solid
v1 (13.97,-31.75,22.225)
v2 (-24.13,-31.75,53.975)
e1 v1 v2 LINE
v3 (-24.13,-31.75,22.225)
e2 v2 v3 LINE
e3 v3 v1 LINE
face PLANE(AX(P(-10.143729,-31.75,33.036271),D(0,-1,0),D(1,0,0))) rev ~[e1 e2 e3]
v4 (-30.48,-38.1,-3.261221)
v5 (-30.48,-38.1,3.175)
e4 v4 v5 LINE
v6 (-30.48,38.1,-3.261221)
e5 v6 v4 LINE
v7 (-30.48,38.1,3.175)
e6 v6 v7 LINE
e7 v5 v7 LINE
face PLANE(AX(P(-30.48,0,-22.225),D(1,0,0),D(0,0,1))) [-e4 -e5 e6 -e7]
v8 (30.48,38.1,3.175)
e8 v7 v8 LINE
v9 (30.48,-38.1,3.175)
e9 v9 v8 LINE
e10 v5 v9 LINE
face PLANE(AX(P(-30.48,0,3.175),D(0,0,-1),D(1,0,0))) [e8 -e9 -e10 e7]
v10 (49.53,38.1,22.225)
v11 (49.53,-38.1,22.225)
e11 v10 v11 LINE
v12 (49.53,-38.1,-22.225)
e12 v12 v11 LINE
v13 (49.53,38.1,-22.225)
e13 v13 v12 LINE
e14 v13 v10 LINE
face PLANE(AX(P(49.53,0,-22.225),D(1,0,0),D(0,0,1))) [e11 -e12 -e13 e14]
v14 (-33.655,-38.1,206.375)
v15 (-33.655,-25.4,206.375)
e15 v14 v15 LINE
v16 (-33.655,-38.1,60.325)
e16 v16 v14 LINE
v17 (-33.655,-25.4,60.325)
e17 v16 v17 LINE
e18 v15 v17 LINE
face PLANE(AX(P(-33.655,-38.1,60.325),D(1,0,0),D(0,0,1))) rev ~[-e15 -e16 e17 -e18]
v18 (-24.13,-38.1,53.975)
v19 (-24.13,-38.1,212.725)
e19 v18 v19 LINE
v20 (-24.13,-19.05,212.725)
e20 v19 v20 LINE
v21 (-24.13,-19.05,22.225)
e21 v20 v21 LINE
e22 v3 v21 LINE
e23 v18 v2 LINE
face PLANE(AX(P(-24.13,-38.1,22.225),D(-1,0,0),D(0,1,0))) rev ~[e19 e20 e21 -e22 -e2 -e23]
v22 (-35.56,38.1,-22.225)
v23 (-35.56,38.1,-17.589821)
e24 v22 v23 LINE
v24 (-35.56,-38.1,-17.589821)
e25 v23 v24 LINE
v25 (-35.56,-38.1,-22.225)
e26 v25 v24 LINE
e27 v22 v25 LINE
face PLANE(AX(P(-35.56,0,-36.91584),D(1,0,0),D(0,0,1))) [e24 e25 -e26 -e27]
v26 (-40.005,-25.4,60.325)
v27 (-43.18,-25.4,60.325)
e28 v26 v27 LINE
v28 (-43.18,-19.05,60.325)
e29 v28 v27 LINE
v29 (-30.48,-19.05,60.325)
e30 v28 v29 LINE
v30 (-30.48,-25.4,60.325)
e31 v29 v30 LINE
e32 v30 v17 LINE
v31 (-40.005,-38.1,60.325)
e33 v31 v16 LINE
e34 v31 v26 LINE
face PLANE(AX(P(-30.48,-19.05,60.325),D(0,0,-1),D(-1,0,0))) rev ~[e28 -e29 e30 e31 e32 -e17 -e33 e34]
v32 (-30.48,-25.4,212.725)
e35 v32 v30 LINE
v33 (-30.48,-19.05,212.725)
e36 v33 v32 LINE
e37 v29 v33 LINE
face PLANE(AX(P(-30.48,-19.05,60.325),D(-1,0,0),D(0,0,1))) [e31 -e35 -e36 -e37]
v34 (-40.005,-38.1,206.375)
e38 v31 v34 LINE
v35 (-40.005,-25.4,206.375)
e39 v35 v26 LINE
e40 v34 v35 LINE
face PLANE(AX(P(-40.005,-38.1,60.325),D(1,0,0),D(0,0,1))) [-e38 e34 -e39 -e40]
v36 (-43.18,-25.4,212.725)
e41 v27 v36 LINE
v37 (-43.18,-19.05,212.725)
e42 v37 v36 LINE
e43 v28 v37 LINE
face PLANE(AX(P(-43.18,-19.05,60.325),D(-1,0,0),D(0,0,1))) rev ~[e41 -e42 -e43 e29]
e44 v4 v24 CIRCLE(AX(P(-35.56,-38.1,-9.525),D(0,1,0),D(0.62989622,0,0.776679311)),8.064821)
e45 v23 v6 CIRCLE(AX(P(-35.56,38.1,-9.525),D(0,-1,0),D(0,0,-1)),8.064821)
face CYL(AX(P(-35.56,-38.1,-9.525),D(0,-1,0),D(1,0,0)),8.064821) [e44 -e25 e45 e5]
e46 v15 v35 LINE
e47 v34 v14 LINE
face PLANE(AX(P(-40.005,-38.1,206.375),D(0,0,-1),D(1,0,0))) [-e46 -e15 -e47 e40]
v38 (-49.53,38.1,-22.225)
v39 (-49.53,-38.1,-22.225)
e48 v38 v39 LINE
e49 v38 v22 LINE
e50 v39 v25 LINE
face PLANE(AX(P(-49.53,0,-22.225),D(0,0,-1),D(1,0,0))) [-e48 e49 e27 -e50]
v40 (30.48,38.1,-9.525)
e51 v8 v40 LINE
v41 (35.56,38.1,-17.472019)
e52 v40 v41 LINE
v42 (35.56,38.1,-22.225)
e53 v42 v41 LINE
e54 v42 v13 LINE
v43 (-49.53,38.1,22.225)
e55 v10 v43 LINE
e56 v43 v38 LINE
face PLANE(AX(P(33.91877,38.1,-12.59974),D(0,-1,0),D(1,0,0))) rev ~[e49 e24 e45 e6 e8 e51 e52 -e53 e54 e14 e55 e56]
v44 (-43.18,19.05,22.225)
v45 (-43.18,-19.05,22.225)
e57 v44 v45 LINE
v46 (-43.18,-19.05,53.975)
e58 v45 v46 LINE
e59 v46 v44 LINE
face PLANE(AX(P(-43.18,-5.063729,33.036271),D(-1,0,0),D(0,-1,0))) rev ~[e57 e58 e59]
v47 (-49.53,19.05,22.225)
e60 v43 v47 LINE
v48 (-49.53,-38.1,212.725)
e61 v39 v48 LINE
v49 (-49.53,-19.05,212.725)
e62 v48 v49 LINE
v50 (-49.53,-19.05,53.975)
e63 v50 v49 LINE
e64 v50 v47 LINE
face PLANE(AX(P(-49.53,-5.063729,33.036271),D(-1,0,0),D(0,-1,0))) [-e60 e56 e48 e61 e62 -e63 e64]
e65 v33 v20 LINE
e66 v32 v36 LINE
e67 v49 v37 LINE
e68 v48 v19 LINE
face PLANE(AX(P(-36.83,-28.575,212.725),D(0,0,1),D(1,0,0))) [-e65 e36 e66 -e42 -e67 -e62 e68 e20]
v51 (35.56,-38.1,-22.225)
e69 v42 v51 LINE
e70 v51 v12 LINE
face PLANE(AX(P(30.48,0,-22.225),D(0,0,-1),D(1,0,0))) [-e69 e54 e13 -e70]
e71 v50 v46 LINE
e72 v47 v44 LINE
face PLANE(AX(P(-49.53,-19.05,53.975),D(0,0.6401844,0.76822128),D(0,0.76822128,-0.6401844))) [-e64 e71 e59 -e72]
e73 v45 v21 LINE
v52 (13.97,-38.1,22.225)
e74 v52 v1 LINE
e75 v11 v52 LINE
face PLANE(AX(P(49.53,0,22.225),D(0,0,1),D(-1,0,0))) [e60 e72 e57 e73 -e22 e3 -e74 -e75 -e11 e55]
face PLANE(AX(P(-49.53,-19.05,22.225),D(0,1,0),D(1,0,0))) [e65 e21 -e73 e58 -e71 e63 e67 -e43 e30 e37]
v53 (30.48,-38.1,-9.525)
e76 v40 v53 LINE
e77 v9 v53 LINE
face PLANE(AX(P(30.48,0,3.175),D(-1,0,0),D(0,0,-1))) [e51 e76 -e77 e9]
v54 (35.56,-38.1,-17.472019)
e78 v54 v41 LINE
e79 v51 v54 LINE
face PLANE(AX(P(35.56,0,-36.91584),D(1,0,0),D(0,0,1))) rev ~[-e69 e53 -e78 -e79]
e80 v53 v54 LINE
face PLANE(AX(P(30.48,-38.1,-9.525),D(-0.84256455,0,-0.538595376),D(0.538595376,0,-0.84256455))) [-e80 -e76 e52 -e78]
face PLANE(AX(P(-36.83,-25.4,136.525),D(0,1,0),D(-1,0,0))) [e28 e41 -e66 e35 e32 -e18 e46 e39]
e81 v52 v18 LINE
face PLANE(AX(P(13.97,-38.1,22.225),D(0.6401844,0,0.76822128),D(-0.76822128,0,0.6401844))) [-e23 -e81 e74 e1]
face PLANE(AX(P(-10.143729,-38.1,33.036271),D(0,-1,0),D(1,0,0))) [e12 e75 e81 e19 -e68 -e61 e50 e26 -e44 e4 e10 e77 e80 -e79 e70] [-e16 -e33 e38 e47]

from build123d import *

# Parameters (mm, degrees)
F1_DEPTH  = 38.1
F2_W      = 71.12
F2_H      = 27.3908400369
F3_DEPTH  = 50.8
F4_W      = 25.4
F4_H      = 19.05
F5_DEPTH  = 190.5
F6_W      = 12.7
F6_H      = 152.4
F7_DEPTH  = 6.35
F9_DEPTH  = 6.35
F10_R     = 8.0648205789
F11_DEPTH = 76.2
F13_DEPTH = 76.2
F15_DEPTH = 6.35
F17_DEPTH = 6.35
F18_W     = 6.35
F18_H     = 146.05
F19_DEPTH = 25.4


with BuildPart() as f1:
    # F0 (on Front) → F1 (new body, symmetric)
    with BuildSketch(Plane.XZ):
        Polygon((30.48, -22.225), (49.53, -22.225), (49.53, 22.225), (-49.53, 22.225), (-49.53, -22.225), (-30.48, -22.225), (-30.48, 3.175), (30.48, 3.175), align=None)
    extrude(amount=F1_DEPTH, both=True)

    # F2 (on Front) → F3 (cut, symmetric)
    with BuildSketch(Plane.XZ):
        with Locations((0, -23.2204200185)):
            Rectangle(F2_W, F2_H)
    extrude(amount=F3_DEPTH, both=True, mode=Mode.SUBTRACT)

    # F4 (on face) → F5 (join)
    with BuildSketch(Plane.XY.offset(22.225)):
        with Locations((-36.83, -28.575)):
            Rectangle(F4_W, F4_H)
    extrude(amount=F5_DEPTH)

    # F6 (on face) → F7 (cut)
    with BuildSketch(Plane(origin=(0, -19.05, 0), x_dir=(-1, 0, 0), z_dir=(0, 1, 0))):
        with Locations((36.83, 136.525)):
            Rectangle(F6_W, F6_H)
    extrude(amount=-F7_DEPTH, mode=Mode.SUBTRACT)

    # F8 (on face) → F9 (cut)
    with BuildSketch(Plane(origin=(0, -19.05, 0), x_dir=(-1, 0, 0), z_dir=(0, 1, 0))):
        Polygon((33.655, 200.025), (33.655, 225.425), (20.955, 225.425), (20.955, 200.025), (24.13, 200.025), (24.13, 212.725), (30.48, 212.725), (30.48, 200.025), align=None)
    extrude(amount=-F9_DEPTH, mode=Mode.SUBTRACT)

    # F10 (on face) → F11 (join)
    with BuildSketch(Plane.XZ.offset(38.1)):
        with Locations((-35.56, -9.525)):
            Circle(F10_R)
    extrude(amount=-F11_DEPTH)

    # F12 (on face) → F13 (join)
    with BuildSketch(Plane.XZ.offset(38.1)):
        Polygon((35.56, -17.4720194191), (35.56, -9.525), (30.48, -9.525), align=None)
    extrude(amount=-F13_DEPTH)

    # F14 (on face) → F15 (join)
    with BuildSketch(Plane.XZ.offset(38.1)):
        Polygon((-24.13, 53.975), (-24.13, 22.225), (13.97, 22.225), align=None)
    extrude(amount=-F15_DEPTH)

    # F16 (on face) → F17 (join)
    with BuildSketch(Plane(origin=(-49.53, 0, 0), x_dir=(0, -1, 0), z_dir=(-1, 0, 0))):
        Polygon((-19.05, 22.225), (19.05, 22.225), (19.05, 53.975), align=None)
    extrude(amount=-F17_DEPTH)

    # F18 (on face) → F19 (cut)
    with BuildSketch(Plane.XZ.offset(38.1)):
        with Locations((-36.83, 133.35)):
            Rectangle(F18_W, F18_H)
    extrude(amount=-F19_DEPTH, mode=Mode.SUBTRACT)


solid = f1.part
